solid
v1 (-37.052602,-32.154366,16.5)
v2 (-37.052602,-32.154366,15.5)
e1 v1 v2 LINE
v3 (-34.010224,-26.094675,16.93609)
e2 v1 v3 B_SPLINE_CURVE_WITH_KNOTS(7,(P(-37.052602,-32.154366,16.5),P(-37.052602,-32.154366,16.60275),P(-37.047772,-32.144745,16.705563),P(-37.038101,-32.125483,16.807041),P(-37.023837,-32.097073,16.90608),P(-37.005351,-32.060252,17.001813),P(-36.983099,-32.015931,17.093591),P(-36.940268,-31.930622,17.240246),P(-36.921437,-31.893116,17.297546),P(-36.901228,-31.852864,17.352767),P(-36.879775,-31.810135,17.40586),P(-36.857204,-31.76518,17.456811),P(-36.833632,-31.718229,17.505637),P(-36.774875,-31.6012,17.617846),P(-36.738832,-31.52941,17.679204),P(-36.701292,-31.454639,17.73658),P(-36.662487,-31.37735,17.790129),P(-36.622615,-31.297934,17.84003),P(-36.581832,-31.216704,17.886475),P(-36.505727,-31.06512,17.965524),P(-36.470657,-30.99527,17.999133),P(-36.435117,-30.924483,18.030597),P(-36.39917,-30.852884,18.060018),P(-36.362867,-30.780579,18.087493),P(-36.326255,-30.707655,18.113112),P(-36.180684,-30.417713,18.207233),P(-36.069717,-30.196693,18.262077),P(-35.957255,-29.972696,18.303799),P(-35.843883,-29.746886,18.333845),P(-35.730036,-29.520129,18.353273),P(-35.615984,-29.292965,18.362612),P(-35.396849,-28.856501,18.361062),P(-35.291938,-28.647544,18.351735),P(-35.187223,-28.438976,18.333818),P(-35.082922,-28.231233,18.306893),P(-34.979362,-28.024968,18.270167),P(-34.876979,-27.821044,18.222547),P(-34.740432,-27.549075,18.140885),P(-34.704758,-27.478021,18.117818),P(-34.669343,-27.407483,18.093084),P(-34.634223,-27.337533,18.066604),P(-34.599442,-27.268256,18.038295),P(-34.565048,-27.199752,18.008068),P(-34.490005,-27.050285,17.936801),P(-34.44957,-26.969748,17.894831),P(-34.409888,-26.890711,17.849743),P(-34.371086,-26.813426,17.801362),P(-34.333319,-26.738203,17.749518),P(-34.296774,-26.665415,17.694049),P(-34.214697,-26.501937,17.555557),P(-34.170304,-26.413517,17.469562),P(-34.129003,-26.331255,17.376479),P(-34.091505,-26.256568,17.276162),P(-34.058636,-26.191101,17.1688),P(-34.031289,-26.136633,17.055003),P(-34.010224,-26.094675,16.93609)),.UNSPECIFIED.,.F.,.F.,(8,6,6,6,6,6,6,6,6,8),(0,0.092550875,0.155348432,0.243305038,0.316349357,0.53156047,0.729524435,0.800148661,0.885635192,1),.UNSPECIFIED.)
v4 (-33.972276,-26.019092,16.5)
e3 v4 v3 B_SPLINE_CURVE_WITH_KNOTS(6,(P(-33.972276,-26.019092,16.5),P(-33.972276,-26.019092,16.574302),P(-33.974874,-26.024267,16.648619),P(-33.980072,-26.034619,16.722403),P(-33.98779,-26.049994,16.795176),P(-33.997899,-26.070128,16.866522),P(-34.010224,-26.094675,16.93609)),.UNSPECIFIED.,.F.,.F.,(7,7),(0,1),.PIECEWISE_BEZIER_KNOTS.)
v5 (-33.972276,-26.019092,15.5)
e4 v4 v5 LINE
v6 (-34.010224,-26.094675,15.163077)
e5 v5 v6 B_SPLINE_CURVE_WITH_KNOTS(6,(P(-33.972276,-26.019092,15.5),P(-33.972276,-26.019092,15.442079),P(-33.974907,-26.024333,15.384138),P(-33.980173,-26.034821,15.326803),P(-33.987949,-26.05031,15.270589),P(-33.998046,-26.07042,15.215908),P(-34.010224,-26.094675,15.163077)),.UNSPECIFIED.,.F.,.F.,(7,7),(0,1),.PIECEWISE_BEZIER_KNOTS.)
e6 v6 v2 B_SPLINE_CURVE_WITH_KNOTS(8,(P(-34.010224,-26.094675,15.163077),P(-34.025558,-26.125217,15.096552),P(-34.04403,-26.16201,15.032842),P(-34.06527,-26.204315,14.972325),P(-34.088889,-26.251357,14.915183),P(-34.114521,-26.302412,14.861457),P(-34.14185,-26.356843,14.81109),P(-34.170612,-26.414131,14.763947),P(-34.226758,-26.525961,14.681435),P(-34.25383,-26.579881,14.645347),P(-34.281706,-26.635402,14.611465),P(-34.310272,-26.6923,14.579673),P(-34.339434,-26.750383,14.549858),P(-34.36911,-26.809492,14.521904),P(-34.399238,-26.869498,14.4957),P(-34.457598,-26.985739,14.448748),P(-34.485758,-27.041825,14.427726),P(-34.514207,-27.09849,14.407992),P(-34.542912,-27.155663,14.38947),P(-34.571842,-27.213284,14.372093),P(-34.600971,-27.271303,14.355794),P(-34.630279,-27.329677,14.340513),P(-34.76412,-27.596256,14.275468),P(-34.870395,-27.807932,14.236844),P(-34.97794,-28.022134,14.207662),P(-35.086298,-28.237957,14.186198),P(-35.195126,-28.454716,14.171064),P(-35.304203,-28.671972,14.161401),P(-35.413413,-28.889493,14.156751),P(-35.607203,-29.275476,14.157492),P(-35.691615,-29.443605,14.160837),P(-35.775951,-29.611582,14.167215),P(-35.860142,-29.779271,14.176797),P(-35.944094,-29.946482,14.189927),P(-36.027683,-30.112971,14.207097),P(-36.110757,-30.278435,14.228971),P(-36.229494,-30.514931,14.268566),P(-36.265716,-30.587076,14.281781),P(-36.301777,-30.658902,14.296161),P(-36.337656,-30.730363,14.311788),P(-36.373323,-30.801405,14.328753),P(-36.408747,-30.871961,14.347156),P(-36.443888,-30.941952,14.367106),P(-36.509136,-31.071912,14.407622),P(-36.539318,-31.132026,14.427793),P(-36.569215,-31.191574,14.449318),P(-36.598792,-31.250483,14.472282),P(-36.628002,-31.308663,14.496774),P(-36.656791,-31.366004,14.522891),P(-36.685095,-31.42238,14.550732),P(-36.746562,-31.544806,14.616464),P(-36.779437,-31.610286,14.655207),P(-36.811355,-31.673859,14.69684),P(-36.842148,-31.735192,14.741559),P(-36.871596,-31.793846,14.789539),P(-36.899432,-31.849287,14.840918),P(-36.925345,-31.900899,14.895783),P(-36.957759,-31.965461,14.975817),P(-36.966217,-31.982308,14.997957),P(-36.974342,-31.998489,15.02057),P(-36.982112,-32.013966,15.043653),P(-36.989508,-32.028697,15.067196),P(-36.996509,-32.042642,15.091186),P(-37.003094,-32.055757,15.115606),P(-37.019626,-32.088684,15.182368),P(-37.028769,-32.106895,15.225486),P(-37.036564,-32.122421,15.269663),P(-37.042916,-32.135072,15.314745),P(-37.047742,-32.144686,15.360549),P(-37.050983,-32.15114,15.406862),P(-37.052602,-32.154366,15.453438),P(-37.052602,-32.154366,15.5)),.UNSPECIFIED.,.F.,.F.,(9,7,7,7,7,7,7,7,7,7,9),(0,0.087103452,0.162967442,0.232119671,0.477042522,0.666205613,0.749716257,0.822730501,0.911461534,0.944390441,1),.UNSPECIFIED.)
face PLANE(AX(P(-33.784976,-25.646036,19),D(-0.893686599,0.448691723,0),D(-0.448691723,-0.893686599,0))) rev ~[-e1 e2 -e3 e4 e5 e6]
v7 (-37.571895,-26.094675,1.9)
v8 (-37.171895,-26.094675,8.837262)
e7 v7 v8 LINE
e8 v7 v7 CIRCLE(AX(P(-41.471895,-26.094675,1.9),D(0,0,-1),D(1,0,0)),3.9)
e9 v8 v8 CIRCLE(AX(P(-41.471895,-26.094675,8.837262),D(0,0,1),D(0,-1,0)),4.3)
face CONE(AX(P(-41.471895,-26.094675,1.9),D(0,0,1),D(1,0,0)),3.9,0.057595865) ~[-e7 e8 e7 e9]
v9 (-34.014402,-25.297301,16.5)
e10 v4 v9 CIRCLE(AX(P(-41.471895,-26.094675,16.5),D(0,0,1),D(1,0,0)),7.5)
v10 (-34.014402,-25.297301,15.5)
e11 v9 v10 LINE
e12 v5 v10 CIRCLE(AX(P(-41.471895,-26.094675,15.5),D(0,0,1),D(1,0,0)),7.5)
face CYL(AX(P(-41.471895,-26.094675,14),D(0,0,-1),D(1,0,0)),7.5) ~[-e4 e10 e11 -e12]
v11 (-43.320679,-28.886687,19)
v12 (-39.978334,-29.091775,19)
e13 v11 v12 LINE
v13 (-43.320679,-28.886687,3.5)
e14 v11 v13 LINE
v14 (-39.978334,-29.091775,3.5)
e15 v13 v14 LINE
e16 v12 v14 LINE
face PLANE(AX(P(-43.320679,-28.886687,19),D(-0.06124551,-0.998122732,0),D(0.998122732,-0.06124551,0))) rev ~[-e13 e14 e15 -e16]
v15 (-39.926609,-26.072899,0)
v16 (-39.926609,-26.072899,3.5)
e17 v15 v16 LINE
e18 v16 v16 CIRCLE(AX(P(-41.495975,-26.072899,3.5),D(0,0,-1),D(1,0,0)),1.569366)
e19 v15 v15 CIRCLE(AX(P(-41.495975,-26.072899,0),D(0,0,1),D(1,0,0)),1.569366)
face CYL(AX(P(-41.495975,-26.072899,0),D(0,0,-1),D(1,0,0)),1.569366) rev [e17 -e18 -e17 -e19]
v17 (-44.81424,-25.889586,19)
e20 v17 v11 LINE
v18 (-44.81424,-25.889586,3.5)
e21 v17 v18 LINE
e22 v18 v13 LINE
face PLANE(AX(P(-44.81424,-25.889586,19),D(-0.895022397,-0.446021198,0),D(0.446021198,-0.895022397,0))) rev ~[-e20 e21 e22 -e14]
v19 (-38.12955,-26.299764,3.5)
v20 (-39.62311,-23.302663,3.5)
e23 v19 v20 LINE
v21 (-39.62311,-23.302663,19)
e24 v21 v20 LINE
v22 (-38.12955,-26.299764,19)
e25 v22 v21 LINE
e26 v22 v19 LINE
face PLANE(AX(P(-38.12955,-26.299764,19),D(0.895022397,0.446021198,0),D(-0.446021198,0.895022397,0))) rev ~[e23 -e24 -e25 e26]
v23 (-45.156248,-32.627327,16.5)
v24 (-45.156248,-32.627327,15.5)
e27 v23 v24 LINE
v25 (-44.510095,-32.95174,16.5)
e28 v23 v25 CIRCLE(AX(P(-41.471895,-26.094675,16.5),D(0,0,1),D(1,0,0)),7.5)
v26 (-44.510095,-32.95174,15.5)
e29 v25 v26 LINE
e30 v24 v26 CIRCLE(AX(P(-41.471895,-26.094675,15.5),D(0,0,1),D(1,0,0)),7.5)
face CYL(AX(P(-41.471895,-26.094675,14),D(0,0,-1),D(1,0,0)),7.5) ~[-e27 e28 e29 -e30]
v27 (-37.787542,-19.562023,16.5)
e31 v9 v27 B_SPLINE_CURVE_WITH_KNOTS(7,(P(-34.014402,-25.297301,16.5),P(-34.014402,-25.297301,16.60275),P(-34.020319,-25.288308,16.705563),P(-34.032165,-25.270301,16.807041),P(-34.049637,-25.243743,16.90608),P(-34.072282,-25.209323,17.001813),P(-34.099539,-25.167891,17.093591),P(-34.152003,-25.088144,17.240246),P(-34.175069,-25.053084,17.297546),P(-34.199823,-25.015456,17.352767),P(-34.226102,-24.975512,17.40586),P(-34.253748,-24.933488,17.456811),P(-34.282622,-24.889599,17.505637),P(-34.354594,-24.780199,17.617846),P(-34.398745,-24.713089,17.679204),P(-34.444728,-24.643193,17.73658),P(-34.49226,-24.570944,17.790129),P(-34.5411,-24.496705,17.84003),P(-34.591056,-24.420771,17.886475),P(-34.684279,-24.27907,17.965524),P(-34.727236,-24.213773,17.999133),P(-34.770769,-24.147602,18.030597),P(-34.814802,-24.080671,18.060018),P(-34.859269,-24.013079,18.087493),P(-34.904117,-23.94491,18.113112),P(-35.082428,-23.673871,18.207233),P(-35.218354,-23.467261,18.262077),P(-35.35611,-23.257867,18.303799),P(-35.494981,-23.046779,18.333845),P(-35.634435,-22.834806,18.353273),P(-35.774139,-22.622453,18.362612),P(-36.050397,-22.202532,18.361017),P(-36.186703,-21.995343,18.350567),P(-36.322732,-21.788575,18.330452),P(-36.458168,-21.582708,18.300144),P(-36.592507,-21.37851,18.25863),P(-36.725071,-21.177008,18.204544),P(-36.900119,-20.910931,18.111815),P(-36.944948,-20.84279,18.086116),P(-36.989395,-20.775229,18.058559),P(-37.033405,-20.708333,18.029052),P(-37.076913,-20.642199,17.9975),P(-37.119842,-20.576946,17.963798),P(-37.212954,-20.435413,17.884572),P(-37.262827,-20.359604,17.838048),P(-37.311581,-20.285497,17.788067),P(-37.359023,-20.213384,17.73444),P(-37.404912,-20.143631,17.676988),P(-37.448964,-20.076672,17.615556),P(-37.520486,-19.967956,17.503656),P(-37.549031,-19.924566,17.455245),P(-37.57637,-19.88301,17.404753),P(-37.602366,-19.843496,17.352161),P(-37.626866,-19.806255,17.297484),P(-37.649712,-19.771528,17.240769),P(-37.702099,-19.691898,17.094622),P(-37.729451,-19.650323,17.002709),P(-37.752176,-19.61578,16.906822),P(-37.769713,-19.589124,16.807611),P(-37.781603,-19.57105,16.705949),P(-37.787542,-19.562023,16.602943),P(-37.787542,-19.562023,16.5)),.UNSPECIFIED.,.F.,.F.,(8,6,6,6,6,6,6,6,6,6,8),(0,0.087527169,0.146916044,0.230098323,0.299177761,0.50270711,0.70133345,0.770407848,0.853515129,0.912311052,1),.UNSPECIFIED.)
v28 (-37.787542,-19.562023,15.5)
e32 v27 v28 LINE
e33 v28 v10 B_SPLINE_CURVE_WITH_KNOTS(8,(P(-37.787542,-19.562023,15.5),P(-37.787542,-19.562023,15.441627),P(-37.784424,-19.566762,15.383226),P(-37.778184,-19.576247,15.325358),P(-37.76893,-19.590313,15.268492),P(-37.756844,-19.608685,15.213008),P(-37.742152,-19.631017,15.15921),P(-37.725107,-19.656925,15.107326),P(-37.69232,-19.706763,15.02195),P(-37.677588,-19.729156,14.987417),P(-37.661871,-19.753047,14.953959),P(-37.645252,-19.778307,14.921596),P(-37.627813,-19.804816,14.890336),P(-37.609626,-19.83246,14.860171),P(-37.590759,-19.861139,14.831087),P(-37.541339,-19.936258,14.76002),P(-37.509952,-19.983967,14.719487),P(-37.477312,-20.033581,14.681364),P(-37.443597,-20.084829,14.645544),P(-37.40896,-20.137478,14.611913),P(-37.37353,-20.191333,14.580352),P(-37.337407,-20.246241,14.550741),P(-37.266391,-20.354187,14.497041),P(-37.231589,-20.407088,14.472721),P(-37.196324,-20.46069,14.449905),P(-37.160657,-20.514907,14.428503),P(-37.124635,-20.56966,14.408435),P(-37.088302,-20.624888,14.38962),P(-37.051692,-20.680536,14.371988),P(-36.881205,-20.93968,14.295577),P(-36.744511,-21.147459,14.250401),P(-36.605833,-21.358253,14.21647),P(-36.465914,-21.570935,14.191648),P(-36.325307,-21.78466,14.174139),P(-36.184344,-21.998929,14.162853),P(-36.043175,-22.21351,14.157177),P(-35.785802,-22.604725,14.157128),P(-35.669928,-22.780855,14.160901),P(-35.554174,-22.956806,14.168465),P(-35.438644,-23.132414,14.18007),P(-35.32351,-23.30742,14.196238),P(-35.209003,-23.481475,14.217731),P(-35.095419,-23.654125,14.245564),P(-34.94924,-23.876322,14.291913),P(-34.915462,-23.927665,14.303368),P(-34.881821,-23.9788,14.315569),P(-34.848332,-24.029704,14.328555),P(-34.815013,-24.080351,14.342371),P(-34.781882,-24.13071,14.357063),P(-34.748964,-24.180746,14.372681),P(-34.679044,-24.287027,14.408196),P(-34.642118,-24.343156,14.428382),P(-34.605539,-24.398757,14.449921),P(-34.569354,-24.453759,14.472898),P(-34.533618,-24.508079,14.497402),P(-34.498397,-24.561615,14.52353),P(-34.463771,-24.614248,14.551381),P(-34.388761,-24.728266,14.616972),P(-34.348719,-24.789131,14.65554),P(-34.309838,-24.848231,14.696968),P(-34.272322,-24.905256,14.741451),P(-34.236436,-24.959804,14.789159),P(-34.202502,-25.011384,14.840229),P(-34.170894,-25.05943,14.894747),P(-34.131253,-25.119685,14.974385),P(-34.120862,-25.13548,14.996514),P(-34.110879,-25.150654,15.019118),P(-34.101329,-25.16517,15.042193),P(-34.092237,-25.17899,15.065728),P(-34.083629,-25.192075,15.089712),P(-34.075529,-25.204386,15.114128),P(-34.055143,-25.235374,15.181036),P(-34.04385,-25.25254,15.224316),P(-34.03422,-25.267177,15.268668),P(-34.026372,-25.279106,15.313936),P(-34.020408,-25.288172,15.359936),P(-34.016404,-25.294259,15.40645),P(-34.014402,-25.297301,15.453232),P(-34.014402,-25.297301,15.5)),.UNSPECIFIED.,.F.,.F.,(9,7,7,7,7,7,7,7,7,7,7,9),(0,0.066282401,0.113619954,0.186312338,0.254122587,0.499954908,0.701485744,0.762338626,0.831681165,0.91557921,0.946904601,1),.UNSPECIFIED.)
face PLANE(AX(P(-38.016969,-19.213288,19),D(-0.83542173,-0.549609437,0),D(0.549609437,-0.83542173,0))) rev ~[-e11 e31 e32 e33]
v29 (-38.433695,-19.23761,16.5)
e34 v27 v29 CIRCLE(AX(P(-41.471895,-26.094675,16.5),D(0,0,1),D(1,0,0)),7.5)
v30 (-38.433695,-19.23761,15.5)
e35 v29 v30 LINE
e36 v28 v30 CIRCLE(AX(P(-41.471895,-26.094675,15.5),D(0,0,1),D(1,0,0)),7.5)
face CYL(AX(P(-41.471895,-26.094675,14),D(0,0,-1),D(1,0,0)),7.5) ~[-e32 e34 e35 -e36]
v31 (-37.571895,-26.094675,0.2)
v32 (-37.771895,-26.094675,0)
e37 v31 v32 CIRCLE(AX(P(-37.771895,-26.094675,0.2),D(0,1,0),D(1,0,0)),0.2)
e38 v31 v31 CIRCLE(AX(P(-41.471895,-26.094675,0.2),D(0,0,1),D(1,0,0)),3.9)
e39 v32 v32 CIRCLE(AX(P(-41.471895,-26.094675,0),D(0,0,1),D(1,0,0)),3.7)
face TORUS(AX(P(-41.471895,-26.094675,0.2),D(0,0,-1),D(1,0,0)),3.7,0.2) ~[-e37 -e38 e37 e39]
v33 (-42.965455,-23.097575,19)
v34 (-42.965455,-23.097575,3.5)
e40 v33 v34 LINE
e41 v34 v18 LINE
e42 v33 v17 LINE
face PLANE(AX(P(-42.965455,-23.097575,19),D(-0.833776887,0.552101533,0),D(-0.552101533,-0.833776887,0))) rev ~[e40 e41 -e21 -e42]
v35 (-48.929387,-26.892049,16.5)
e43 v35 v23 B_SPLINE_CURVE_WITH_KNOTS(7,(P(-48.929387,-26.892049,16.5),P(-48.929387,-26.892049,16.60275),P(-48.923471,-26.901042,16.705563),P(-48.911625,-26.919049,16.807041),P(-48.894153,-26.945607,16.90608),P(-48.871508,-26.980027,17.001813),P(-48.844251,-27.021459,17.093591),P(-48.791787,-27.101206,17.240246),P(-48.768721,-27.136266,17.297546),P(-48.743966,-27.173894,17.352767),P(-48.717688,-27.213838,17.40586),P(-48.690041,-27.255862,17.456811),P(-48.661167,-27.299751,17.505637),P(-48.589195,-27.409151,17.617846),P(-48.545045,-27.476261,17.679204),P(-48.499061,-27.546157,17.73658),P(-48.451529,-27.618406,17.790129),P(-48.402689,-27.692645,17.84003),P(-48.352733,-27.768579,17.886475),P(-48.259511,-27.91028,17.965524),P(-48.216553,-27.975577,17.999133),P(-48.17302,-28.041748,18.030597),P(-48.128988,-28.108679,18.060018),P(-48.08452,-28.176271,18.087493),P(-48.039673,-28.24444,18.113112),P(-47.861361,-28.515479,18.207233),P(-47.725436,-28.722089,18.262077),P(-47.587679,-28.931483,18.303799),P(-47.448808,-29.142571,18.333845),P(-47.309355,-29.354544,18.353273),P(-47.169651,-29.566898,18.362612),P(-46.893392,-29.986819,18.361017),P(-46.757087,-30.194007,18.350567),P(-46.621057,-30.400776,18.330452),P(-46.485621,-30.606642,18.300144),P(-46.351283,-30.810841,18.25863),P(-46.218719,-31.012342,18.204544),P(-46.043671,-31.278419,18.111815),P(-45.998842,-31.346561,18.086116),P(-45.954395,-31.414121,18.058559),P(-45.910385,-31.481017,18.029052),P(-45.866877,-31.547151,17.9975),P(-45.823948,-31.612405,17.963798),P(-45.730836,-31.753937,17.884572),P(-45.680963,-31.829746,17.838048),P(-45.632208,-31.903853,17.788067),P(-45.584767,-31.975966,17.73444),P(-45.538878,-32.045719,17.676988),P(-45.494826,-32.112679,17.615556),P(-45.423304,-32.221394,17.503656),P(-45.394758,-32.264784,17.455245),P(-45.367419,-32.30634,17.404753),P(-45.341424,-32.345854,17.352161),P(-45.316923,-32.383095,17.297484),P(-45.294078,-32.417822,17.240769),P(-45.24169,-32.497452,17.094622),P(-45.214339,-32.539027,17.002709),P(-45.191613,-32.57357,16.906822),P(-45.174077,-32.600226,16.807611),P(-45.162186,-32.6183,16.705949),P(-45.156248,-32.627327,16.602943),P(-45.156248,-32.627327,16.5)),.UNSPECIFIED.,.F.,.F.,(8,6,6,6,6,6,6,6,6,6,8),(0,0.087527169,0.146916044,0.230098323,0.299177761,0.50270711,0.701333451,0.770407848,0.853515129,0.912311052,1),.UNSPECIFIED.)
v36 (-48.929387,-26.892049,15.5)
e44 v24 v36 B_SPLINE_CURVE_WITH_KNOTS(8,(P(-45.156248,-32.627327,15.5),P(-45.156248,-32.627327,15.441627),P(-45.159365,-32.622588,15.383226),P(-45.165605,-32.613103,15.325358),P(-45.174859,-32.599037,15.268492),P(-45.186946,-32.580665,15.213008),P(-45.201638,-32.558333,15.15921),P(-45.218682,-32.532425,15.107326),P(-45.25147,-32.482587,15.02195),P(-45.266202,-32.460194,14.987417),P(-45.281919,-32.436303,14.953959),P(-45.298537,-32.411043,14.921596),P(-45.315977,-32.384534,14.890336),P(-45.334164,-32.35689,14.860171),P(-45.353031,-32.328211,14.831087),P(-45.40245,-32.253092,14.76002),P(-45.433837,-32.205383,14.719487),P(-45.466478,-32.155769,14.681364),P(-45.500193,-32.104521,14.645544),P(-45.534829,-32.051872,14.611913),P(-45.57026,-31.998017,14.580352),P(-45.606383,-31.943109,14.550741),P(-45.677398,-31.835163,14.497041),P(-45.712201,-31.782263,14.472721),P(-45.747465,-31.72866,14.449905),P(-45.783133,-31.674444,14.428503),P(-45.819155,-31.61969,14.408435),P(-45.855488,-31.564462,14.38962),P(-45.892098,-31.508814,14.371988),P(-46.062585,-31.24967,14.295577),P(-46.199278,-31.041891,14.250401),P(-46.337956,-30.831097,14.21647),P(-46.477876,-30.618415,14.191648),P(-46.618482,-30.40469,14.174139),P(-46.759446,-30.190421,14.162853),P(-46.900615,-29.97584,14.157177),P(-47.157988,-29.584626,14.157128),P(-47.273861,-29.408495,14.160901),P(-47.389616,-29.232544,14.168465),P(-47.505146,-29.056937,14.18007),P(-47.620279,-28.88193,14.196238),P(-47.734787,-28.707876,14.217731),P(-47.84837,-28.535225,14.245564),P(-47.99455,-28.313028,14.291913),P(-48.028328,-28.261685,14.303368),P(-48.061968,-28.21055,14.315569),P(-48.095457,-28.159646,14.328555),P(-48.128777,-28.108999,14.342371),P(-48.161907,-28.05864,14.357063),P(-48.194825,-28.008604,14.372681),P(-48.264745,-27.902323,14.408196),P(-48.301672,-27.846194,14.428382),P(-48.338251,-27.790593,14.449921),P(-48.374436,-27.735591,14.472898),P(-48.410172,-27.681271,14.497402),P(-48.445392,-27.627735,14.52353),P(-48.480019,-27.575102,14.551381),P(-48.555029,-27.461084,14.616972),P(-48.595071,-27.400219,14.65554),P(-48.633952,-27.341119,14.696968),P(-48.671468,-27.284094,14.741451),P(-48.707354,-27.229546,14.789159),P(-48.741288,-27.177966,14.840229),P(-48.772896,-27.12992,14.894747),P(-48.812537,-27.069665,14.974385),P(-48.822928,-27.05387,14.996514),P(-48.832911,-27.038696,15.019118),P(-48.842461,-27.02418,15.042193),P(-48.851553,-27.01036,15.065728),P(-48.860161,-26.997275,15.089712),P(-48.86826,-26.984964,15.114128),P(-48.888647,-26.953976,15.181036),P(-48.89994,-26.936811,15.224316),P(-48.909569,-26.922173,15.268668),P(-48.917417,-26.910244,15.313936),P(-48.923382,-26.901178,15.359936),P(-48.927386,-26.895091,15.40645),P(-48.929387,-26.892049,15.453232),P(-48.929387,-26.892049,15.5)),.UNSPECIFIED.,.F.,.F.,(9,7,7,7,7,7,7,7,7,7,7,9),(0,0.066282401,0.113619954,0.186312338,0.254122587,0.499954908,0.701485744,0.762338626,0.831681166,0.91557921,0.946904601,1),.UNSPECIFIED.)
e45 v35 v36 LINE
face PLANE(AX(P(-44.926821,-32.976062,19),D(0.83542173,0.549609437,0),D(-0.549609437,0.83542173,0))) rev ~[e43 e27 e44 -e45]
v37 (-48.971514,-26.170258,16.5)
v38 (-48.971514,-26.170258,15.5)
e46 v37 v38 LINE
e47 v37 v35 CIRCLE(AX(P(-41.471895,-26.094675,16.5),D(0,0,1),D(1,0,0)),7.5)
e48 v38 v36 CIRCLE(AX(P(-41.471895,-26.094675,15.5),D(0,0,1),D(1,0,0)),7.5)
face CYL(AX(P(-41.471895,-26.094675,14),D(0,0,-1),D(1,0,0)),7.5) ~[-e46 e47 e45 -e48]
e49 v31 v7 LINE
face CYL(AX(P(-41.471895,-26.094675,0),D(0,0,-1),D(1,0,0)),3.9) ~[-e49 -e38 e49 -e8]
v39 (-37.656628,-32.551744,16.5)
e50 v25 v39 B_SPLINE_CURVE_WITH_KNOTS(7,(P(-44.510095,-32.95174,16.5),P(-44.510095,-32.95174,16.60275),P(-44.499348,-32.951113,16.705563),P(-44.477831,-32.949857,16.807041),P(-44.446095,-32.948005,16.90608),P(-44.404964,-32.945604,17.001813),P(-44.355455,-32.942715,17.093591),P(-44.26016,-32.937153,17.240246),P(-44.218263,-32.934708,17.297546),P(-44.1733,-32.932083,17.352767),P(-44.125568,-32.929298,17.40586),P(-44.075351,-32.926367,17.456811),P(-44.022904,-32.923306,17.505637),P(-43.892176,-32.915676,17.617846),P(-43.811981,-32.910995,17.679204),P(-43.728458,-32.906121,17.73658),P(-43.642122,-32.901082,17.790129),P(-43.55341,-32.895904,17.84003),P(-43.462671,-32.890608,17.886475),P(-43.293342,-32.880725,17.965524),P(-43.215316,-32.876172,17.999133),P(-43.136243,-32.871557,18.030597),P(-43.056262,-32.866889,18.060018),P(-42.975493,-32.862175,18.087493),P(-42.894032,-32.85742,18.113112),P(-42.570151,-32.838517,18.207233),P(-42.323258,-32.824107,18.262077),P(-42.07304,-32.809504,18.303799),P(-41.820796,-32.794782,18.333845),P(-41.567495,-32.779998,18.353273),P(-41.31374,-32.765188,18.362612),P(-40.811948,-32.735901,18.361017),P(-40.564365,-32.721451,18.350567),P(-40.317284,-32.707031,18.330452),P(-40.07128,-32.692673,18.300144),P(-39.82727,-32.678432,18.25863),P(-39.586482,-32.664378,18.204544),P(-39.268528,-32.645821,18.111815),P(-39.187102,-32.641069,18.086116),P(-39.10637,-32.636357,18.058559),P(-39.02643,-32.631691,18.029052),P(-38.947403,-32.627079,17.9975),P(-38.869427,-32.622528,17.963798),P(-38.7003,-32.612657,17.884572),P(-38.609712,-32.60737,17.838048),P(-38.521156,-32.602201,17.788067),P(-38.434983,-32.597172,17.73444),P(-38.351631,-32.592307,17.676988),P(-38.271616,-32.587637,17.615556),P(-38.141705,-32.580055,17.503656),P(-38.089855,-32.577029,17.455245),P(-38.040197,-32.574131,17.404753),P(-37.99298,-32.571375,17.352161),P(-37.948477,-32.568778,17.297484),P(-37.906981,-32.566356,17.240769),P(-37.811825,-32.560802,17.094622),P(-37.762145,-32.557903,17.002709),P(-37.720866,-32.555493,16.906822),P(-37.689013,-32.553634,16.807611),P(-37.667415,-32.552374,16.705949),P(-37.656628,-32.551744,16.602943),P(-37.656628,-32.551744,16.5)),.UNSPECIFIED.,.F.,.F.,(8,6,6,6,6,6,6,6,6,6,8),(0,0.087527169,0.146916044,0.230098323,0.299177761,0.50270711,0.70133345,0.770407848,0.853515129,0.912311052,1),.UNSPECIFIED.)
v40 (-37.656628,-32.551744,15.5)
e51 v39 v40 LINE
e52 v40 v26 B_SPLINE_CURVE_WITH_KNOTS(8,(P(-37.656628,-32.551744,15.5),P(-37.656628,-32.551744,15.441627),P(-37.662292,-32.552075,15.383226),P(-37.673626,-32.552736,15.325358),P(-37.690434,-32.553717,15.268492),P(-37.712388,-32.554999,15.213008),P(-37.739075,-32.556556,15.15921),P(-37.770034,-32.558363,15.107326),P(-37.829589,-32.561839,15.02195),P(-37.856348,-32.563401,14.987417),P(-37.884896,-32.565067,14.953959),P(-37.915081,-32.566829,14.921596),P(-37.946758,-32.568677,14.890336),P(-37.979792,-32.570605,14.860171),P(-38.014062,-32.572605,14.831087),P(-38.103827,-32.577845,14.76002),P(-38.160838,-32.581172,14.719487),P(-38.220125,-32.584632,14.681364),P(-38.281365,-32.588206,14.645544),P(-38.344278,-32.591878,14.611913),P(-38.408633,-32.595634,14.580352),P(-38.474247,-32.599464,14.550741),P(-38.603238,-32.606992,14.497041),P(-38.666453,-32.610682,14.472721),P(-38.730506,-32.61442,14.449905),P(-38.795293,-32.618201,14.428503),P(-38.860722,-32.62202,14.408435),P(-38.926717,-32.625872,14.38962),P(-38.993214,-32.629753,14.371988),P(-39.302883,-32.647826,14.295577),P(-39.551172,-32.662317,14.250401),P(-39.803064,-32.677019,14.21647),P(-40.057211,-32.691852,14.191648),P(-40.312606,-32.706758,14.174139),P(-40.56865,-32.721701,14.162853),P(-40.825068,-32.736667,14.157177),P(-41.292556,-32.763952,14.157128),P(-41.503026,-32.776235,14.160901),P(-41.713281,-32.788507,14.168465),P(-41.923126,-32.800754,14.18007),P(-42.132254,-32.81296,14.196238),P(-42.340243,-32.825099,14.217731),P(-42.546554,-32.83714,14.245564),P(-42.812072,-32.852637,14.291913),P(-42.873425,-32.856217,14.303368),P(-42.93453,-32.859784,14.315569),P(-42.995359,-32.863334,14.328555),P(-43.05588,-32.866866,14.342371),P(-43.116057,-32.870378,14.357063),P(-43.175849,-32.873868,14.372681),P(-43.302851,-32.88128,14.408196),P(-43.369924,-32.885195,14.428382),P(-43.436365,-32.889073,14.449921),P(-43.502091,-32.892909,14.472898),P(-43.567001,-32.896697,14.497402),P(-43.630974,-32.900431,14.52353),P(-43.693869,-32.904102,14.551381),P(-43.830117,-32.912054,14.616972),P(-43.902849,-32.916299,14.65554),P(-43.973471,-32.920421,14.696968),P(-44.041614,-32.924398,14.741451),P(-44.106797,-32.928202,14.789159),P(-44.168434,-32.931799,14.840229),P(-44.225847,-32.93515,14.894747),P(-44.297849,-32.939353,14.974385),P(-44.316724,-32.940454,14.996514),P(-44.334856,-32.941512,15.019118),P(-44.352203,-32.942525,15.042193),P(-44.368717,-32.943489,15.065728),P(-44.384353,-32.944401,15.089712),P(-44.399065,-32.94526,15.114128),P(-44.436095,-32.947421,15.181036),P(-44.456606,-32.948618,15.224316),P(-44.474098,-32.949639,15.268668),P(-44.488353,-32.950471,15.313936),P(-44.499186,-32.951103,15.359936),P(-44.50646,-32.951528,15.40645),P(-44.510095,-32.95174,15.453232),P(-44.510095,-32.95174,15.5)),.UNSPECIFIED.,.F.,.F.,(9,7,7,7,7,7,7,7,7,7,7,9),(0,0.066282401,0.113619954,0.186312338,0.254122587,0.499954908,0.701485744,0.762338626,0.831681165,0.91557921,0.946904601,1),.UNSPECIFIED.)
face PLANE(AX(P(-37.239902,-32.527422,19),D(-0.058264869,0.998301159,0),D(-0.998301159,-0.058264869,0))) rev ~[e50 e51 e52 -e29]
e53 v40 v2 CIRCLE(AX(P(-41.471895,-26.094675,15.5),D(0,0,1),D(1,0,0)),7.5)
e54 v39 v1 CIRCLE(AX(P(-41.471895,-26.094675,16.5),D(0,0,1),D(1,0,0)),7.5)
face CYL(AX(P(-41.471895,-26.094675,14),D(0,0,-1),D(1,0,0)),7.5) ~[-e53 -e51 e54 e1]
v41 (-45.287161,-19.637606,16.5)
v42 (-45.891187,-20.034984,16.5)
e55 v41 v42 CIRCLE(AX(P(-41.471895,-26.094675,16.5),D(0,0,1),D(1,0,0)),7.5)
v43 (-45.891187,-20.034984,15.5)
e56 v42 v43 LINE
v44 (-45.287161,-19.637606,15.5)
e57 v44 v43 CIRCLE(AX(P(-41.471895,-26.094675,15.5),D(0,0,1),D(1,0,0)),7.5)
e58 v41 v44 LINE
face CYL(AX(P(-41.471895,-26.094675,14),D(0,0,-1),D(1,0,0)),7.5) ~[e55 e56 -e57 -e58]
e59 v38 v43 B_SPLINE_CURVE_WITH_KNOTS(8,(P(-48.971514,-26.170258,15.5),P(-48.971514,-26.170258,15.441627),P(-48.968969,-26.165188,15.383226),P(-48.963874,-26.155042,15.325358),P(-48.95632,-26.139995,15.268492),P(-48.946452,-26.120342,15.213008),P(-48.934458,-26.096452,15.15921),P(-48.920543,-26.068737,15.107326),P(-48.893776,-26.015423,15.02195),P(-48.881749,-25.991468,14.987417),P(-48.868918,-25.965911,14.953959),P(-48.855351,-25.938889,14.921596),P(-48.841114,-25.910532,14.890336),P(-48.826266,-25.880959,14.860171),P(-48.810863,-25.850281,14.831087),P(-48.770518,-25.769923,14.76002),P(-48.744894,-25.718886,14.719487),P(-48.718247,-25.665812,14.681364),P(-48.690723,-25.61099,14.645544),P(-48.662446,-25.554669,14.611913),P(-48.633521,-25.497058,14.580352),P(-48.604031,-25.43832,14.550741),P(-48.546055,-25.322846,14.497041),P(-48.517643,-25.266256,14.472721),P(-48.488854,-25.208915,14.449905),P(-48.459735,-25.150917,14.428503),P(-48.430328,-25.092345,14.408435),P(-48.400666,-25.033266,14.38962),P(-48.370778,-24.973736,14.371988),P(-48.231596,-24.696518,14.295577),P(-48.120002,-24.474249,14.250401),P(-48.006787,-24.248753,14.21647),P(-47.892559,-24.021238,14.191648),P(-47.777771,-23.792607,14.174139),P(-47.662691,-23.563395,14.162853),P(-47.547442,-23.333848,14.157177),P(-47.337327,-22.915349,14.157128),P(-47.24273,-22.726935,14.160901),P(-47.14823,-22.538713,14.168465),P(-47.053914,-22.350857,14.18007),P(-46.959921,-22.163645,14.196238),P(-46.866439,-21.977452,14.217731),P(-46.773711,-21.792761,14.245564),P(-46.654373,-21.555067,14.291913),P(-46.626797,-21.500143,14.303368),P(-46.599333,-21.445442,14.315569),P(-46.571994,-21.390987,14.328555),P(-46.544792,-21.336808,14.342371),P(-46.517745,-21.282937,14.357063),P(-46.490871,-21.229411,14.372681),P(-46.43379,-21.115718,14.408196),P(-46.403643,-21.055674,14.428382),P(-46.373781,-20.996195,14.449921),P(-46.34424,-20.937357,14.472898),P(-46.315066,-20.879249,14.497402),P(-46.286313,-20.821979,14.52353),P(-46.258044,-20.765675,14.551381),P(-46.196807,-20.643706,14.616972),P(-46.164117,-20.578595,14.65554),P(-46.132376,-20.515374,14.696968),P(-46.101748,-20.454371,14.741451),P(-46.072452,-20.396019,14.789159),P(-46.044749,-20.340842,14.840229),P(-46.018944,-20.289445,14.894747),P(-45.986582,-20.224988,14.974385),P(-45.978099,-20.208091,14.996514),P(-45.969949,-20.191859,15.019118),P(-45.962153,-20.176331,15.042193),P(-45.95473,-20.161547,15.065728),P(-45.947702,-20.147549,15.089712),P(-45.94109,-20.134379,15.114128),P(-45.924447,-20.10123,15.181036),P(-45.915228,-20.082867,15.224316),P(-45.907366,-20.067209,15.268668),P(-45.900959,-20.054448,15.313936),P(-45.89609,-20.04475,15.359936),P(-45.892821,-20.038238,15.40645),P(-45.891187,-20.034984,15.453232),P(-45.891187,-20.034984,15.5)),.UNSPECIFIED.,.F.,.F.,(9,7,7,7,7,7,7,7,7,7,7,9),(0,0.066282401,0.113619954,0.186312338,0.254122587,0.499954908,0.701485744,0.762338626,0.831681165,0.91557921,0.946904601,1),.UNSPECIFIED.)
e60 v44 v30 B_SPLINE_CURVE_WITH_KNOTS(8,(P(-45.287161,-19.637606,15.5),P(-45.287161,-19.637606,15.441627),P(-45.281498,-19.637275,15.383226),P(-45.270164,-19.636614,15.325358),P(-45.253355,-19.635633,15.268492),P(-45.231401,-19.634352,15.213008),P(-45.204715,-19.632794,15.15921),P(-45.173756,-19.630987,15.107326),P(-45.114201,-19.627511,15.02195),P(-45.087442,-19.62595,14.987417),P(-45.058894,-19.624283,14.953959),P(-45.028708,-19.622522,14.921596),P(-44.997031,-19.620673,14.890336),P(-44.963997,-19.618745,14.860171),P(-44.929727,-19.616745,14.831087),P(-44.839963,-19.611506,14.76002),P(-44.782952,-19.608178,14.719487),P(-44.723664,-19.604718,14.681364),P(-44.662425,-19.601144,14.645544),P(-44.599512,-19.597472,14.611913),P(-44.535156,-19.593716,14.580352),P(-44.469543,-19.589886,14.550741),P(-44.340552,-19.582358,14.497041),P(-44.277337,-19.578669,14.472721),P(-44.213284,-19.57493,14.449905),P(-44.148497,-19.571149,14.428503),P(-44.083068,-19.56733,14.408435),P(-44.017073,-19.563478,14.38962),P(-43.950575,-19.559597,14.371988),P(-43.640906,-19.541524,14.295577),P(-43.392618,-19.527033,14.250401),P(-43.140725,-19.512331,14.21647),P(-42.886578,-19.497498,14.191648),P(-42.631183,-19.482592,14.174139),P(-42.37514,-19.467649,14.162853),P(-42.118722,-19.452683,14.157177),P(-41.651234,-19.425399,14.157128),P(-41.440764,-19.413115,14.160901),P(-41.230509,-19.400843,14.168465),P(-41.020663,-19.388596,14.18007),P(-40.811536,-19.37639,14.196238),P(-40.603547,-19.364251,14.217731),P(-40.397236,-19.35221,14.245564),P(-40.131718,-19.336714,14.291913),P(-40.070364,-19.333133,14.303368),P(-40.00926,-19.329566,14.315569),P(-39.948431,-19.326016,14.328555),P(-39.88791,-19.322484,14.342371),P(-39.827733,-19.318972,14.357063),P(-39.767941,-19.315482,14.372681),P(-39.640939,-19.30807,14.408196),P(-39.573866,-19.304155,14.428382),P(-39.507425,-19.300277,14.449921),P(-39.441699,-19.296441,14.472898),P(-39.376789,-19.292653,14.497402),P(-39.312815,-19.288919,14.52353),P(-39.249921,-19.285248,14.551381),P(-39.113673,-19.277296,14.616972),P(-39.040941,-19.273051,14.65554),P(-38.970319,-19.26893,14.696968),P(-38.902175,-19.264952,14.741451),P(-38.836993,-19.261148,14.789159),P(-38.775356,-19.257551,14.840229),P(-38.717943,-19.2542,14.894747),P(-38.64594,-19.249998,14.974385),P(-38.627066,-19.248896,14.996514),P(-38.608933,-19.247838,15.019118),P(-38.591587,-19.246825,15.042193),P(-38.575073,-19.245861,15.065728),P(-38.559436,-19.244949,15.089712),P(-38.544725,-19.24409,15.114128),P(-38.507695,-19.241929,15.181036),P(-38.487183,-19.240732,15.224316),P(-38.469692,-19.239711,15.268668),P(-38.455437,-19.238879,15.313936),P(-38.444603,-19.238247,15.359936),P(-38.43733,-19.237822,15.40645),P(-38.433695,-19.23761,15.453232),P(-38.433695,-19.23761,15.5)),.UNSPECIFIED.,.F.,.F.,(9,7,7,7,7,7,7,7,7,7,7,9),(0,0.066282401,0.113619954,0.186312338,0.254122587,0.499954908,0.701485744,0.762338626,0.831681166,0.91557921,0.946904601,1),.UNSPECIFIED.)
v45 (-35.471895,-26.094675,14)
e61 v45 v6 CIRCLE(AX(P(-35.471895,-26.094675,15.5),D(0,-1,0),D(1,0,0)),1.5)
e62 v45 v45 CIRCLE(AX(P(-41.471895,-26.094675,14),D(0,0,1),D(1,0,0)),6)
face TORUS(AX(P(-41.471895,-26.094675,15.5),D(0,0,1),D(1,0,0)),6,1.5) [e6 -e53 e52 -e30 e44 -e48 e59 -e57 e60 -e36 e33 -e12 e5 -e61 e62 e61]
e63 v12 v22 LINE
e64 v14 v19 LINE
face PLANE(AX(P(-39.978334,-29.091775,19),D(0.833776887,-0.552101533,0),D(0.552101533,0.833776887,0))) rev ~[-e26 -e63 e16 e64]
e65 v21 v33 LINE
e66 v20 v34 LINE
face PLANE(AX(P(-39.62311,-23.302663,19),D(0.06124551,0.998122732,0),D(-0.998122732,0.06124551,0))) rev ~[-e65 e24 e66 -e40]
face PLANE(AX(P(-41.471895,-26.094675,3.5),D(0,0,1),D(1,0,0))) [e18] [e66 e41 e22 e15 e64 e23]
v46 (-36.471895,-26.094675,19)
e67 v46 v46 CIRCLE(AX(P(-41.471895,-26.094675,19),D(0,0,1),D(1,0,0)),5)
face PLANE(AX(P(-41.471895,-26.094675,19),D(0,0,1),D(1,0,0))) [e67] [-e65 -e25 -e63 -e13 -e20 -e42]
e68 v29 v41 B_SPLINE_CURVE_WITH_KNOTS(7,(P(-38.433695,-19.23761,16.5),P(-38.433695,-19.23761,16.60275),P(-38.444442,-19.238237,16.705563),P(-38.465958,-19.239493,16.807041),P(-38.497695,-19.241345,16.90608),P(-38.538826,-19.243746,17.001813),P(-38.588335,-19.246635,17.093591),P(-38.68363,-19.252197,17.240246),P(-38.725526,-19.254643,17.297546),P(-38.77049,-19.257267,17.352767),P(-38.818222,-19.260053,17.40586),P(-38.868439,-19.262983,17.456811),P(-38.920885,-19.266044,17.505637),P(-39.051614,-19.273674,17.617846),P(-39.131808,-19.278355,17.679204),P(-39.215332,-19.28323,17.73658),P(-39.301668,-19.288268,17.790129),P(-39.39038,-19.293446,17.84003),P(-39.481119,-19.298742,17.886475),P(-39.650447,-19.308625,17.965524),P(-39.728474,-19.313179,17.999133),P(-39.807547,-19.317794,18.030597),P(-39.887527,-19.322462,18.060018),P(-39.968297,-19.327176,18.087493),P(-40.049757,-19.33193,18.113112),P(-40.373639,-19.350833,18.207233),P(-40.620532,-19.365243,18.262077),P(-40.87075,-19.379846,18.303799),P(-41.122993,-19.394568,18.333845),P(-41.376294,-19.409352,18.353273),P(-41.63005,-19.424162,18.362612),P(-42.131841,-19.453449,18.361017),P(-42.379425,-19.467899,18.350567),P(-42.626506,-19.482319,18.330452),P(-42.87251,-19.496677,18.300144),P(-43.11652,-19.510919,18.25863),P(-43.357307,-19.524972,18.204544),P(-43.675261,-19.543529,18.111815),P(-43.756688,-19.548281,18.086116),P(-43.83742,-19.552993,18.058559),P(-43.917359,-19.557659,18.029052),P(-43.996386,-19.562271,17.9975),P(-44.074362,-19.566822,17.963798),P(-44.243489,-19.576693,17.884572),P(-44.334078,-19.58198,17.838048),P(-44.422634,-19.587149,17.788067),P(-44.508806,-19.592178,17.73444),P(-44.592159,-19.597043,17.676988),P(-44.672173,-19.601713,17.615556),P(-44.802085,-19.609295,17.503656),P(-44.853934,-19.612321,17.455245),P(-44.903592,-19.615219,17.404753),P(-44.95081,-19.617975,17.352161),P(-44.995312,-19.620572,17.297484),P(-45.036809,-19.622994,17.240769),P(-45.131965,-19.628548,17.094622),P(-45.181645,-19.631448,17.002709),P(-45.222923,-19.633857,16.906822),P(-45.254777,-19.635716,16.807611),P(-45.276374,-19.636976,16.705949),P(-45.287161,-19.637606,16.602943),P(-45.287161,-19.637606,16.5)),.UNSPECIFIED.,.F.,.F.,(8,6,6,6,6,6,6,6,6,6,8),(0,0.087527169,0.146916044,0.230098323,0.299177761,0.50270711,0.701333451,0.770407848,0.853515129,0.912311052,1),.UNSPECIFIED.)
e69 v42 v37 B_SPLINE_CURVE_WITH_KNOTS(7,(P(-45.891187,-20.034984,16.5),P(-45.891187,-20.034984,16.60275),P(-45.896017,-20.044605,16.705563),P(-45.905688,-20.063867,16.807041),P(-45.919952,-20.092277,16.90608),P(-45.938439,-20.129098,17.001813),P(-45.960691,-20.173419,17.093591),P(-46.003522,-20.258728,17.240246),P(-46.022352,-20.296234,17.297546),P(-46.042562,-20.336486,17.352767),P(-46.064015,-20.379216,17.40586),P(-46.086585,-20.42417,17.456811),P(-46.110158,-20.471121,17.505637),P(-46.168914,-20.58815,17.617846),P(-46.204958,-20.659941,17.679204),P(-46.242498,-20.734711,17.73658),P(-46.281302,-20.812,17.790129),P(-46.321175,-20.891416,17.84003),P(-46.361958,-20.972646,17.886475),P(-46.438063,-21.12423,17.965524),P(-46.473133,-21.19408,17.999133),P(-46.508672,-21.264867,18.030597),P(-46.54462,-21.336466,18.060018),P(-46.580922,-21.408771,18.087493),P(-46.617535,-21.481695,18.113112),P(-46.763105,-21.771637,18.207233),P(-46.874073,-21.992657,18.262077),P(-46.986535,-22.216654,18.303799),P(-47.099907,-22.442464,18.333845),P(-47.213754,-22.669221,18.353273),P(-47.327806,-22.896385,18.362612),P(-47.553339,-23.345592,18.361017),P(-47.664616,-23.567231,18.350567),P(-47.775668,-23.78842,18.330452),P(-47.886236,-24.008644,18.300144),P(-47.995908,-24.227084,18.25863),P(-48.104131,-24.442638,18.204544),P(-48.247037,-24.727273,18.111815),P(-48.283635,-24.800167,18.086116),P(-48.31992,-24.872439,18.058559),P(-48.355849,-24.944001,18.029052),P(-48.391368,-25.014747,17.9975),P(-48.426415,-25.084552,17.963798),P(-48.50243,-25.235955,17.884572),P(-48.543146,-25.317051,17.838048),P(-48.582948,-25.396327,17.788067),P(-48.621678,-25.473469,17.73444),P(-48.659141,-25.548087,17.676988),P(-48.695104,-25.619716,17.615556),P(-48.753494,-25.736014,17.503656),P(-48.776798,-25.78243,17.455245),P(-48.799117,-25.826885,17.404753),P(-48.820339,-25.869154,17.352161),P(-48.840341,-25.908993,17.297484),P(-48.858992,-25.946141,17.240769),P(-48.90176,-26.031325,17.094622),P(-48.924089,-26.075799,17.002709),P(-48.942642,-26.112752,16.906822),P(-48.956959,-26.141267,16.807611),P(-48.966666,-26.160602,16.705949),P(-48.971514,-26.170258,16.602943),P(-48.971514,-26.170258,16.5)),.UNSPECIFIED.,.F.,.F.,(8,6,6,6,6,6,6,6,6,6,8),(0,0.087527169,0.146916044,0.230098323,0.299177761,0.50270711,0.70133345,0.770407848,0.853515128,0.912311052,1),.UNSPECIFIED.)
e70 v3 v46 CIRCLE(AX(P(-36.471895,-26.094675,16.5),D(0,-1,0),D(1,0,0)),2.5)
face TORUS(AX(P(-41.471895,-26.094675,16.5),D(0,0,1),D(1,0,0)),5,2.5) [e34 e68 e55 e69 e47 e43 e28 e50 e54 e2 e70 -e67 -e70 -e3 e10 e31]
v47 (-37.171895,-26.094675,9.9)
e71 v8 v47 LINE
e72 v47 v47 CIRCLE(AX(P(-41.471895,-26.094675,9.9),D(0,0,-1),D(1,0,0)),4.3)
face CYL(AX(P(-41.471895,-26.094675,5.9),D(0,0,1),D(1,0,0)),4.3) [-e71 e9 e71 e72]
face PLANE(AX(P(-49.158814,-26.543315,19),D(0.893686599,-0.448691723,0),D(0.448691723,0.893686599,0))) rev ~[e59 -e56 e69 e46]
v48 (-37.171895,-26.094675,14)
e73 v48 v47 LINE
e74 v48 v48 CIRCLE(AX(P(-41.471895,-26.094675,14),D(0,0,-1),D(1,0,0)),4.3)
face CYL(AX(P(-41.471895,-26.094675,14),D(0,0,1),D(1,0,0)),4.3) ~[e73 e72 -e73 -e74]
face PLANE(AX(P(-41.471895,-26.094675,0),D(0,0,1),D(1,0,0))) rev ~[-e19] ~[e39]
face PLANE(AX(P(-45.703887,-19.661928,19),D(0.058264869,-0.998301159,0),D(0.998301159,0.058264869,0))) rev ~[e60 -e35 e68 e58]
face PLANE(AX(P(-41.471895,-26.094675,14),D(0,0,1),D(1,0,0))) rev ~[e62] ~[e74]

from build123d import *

# Parameters (mm, degrees)
F0_R         = 3.9
F2_DEPTH     = 14
F3_R         = 7.5
F4_DEPTH     = 5
F6_R         = 4.3
F7_DEPTH     = 4.1
F1_R         = 1.5693660879
F8_DEPTH     = 23.4
F9_DEPTH     = 15.5
F10_R        = 0.2
F11_S5_R     = 4.3
F11_T6_DEPTH = 9
F12_R        = 1.5
F13_R        = 2.5
F15_R        = 8.6051956913
F16_DEPTH    = 6


# Not quite as in the source:
# - a fillet or chamfer that OpenCascade refuses, or shapes differently, is made with other operations: its cross-section is extruded or revolved along the edge and cut away or added


with BuildPart() as f2:
    # F0 (on Top) → F2 (new body)
    with BuildSketch(Plane.XY):
        with Locations((-41.4718948305, -26.0946750641)):
            Circle(F0_R)
    extrude(amount=F2_DEPTH)

    # F3 (on face) → F4 (join)
    with BuildSketch(Plane.XY.offset(14)):
        with Locations((-41.4718948305, -26.0946750641)):
            Circle(F3_R)
    extrude(amount=F4_DEPTH)

    # F6 (on face) → F7 (join)
    with BuildSketch(Plane(origin=(0, 0, 14), x_dir=(1, 0, 0), z_dir=(0, 0, -1))):
        with Locations((-41.4718948305, 26.0946750641)):
            Circle(F6_R)
    extrude(amount=F7_DEPTH)

    # F1 (on Top) → F8 (cut)
    with BuildSketch(Plane.XY):
        with Locations((-41.495975107, -26.0728988796)):
            Circle(F1_R)
    extrude(amount=F8_DEPTH, mode=Mode.SUBTRACT)

    # F5 (on face) → F9 (cut)
    with BuildSketch(Plane.XY.offset(19)):
        Polygon((-39.9783341683, -29.0917753096), (-38.1295495491, -26.2997637113), (-39.6231102113, -23.3026634658), (-42.9654554927, -23.0975748186), (-44.8142401119, -25.8895864169), (-43.3206794497, -28.8866866624), align=None)
    extrude(amount=-F9_DEPTH, mode=Mode.SUBTRACT)

    # F10
    f10_edges = [f2.edges().sort_by_distance(p)[0] for p in [
        (-45.371895, -26.094675, 0),
    ]]
    fillet(f10_edges, radius=F10_R)

    # F11: chamfer of 8 x 0.4612770977 on 1 edges, made by hand


with BuildPart() as f11_tool2:
    # F11_s3 → F11_t4 (revolve)
    with BuildSketch(Plane.XZ.offset(26.0946750641)):
        Polygon((-37.5718948305, 1.9), (-37.1106177328, 9.9), (-37.5718948305, 9.9), align=None)
    revolve(axis=Axis((-41.4718948305, -26.0946750641, 9.9), (0, 0, -1)))

    # F11_s5 → F11_t6 (intersect, symmetric)
    with BuildSketch(Plane.XY.offset(5.9)):
        with Locations((-41.4718948305, -26.0946750641)):
            Circle(F11_S5_R)
    extrude(amount=F11_T6_DEPTH, both=True, mode=Mode.INTERSECT)


with BuildPart() as f2_1:
    add(f2.part)

    # F11_t1: union F11_tool2
    add(f11_tool2.part)

    # F12
    f12_edges = [f2_1.edges().sort_by_distance(p)[0] for p in [
        (-48.971895, -26.094675, 14),
    ]]
    fillet(f12_edges, radius=F12_R)

    # F13
    f13_edges = [f2_1.edges().sort_by_distance(p)[0] for p in [
        (-48.971895, -26.094675, 19),
    ]]
    fillet(f13_edges, radius=F13_R)

    # F15 (on face) → F16 (cut)
    with BuildSketch(Plane.XY.offset(19)):
        with Locations((-41.4718948305, -26.0946750641)):
            Circle(F15_R)
        Polygon((-49.1588137584, -26.5433145587), (-45.7038874939, -19.661927743), (-38.016968566, -19.2132882484), (-33.7849759026, -25.6460355695), (-37.2399021671, -32.5274223852), (-44.926821095, -32.9760618798), align=None, mode=Mode.SUBTRACT)
    extrude(amount=-F16_DEPTH, mode=Mode.SUBTRACT)


solid = f2_1.part
